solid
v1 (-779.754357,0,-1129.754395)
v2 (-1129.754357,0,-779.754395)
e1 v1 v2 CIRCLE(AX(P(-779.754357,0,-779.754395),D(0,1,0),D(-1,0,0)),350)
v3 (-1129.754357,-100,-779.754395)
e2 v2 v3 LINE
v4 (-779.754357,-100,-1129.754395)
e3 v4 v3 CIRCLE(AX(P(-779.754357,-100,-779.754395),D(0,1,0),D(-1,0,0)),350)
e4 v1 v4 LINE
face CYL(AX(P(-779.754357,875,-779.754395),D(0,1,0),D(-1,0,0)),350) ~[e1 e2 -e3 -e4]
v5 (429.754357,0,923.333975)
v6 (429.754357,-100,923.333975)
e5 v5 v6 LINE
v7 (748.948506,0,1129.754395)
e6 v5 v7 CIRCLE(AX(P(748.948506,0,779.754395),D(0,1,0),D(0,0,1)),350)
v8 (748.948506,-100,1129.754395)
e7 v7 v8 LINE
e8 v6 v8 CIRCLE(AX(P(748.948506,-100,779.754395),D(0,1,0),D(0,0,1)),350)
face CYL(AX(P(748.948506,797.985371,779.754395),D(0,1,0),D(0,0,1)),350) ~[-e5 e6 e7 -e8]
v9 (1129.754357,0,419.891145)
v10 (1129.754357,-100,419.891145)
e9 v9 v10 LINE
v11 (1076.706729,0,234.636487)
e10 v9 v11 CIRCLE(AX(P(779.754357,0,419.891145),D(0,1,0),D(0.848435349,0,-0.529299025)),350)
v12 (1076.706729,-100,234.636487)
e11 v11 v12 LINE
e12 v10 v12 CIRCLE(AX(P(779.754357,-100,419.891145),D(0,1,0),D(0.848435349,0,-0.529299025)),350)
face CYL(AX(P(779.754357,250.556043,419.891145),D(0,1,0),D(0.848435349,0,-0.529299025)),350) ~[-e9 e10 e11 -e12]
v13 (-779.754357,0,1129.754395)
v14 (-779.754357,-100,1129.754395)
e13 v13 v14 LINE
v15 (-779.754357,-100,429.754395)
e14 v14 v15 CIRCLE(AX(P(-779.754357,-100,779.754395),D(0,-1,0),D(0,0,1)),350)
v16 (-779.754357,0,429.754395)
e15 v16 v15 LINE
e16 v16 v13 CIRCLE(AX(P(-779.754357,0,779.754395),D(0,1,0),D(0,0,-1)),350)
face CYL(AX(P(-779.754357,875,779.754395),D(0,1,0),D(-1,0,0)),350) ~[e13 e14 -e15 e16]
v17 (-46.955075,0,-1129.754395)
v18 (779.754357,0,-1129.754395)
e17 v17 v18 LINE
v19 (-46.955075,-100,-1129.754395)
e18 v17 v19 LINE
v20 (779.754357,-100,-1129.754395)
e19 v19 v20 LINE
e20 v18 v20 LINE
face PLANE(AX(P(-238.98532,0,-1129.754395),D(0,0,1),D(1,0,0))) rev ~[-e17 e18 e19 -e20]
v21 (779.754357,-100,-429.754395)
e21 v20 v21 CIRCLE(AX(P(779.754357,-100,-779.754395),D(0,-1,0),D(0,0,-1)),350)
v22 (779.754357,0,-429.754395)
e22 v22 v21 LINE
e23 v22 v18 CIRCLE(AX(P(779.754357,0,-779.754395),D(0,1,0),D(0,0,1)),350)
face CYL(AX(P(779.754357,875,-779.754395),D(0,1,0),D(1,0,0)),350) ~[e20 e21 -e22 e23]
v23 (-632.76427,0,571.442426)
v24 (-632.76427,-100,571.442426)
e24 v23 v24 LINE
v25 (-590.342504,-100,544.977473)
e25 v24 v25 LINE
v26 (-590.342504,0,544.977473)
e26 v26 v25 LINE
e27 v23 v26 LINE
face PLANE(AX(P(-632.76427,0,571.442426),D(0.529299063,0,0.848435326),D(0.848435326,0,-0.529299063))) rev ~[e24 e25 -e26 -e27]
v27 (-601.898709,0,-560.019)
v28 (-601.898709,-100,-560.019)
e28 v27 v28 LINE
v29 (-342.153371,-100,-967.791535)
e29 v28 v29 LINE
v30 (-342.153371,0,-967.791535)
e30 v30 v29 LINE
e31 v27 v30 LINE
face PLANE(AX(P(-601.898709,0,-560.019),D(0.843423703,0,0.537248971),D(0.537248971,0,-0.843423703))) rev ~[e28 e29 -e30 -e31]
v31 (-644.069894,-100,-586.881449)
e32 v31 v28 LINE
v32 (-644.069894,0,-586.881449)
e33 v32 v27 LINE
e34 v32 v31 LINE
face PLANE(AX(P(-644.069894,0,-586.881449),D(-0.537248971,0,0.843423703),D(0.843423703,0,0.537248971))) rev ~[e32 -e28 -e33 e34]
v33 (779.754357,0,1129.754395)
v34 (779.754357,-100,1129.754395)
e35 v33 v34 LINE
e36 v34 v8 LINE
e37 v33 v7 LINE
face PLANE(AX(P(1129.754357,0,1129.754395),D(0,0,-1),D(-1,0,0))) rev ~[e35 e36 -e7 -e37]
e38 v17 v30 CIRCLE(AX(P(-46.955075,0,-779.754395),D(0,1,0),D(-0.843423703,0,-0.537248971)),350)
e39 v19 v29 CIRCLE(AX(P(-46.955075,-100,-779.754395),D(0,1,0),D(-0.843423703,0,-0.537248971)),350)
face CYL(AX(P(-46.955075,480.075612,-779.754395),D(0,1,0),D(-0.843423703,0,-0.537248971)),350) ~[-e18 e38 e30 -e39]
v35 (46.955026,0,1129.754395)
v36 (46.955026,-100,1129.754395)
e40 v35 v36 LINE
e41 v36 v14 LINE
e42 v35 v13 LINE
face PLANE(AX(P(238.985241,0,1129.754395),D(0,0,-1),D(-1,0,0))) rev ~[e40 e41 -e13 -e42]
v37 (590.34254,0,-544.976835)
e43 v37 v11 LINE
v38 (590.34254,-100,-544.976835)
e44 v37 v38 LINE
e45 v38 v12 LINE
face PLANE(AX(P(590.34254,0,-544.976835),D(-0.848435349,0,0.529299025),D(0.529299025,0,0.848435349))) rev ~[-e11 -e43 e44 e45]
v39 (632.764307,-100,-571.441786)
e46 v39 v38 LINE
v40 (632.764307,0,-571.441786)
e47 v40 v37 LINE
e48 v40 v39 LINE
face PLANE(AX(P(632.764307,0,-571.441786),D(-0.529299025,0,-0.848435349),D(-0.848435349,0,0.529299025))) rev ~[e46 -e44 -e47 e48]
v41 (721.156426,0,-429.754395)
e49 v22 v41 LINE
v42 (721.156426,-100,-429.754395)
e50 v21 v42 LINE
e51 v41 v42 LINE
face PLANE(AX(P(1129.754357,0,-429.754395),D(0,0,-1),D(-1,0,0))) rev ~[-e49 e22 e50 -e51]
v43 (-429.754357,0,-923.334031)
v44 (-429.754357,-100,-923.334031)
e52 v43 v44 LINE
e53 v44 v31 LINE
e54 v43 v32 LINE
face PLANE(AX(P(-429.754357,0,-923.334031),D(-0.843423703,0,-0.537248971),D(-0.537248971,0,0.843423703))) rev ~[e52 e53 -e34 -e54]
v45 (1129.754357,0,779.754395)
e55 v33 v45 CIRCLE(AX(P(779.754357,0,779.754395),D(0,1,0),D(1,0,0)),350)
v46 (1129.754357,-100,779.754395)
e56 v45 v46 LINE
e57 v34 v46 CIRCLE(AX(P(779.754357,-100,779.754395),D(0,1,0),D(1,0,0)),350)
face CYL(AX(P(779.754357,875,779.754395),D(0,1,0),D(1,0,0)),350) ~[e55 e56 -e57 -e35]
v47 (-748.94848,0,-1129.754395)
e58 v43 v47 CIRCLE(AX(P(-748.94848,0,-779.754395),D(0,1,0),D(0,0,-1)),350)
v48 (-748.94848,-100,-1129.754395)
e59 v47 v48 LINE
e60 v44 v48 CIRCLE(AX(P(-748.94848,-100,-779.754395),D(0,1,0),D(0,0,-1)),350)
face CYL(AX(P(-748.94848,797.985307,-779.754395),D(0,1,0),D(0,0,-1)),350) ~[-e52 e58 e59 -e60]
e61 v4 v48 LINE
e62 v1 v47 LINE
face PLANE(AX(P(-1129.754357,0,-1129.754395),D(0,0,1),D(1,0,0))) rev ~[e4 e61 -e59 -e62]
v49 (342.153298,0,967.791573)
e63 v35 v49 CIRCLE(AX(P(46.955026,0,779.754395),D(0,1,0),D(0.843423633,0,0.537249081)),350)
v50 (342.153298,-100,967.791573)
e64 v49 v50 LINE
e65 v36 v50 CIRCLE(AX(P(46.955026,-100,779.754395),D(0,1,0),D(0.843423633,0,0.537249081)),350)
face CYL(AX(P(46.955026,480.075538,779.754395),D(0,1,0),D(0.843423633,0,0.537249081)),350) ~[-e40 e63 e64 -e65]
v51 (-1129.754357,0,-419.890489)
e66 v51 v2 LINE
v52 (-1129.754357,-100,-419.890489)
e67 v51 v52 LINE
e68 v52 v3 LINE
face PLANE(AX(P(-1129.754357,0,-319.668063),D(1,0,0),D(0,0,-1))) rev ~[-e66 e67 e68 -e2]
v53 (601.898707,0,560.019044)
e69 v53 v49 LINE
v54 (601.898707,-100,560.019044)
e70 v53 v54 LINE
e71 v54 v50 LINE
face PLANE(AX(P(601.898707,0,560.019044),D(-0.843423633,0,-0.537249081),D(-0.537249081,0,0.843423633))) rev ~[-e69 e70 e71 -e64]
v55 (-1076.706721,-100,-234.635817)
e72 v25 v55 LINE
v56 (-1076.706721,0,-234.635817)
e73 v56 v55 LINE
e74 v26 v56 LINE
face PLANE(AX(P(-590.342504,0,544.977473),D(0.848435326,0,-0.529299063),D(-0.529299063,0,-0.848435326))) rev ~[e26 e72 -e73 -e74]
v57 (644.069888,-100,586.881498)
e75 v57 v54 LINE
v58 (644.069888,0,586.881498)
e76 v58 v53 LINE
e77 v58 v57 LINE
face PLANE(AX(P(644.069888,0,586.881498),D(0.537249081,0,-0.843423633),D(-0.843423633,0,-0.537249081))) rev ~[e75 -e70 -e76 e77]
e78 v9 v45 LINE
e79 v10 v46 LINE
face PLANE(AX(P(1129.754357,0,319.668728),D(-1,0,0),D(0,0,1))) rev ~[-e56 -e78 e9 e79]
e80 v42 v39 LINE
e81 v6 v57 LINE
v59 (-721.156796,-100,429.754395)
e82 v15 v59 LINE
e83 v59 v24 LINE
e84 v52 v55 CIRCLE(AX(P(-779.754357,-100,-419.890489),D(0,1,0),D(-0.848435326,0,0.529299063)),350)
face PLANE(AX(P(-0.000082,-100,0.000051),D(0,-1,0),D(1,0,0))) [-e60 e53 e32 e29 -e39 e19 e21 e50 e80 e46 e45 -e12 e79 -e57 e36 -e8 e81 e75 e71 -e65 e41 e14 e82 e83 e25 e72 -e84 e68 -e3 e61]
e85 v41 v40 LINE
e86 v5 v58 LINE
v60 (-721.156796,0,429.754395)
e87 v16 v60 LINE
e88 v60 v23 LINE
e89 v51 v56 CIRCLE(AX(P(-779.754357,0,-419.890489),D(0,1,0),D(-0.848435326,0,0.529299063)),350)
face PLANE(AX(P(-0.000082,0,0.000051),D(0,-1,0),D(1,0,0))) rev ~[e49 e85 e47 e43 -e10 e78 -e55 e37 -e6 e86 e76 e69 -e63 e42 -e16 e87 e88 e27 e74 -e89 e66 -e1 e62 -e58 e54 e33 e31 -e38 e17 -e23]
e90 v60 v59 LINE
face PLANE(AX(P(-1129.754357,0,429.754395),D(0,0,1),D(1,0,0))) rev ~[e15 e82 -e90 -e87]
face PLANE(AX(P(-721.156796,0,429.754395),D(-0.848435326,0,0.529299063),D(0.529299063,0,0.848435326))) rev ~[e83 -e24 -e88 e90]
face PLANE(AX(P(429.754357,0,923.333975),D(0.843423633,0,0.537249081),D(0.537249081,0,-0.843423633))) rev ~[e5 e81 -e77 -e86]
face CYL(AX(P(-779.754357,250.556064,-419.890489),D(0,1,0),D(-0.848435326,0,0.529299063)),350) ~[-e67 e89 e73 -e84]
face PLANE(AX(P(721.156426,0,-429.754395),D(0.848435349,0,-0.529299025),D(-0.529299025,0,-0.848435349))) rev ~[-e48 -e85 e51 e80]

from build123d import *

# Parameters (mm, degrees)
F1_DEPTH     = 100
F2_T1_DEPTH  = 1850
F2_T3_DEPTH  = 1695.9707417334
F2_T5_DEPTH  = 1695.9706144549
F2_T7_DEPTH  = 601.1121280065
F2_T9_DEPTH  = 1060.1512237757
F2_T11_DEPTH = 601.1120863274
F2_T13_DEPTH = 1060.1510758761


# Not quite as in the source:
# - a fillet or chamfer that OpenCascade refuses, or shapes differently, is made with other operations: its cross-section is extruded or revolved along the edge and cut away or added


with BuildPart() as f1:
    # F0 (on Front) → F1 (new body)
    with BuildSketch(Plane.XZ):
        Polygon((1129.7543572, 319.6687281531), (1129.7543572, 1129.7543953), (429.7543572, 1129.7543953), (429.7543572, 923.3339748412), (644.069888311, 586.8814977509), (601.898706638, 560.0190437248), (238.9852410529, 1129.7543953), (-1129.7543572, 1129.7543953), (-1129.7543572, 429.7543953), (-721.1567962335, 429.7543953), (-632.764270148, 571.4424256952), (-590.342503852, 544.9774725622), (-1129.7543572, -319.6680631783), (-1129.7543572, -1129.7543953), (-429.7543572, -1129.7543953), (-429.7543572, -923.3340314322), (-644.0698939815, -586.8814489736), (-601.8987088185, -560.0190004264), (-238.9853197059, -1129.7543953), (1129.7543572, -1129.7543953), (1129.7543572, -429.7543953), (721.156425601, -429.7543953), (632.7643072985, -571.4417859327), (590.3425398375, -544.9768346673), align=None)
    extrude(amount=F1_DEPTH)

    # F2: fillet of radius 350 on 12 edges, made by hand

    # F2_s2 → F2_t1 (cut)
    with BuildSketch(Plane.XZ.offset(-875)):
        with BuildLine():
            ThreePointArc((1129.7543572, 779.7543953), (1027.2417306153, 1027.2417687153), (779.7543572, 1129.7543953))
            Line((779.7543572, 1129.7543953), (1129.7543572, 1129.7543953))
            Line((1129.7543572, 1129.7543953), (1129.7543572, 779.7543953))
        make_face()
        with BuildLine():
            ThreePointArc((-779.7543572, 1129.7543953), (-1027.2417306153, 1027.2417687153), (-1129.7543572, 779.7543953))
            Line((-1129.7543572, 779.7543953), (-1129.7543572, 1129.7543953))
            Line((-1129.7543572, 1129.7543953), (-779.7543572, 1129.7543953))
        make_face()
        with BuildLine():
            ThreePointArc((-1129.7543572, 779.7543953), (-1027.2417306153, 532.2670218847), (-779.7543572, 429.7543953))
            Line((-779.7543572, 429.7543953), (-1129.7543572, 429.7543953))
            Line((-1129.7543572, 429.7543953), (-1129.7543572, 779.7543953))
        make_face()
        with BuildLine():
            ThreePointArc((-1129.7543572, -779.7543953), (-1027.2417306153, -1027.2417687153), (-779.7543572, -1129.7543953))
            Line((-779.7543572, -1129.7543953), (-1129.7543572, -1129.7543953))
            Line((-1129.7543572, -1129.7543953), (-1129.7543572, -779.7543953))
        make_face()
        with BuildLine():
            ThreePointArc((1129.7543572, -779.7543953), (1027.2417306153, -1027.2417687153), (779.7543572, -1129.7543953))
            Line((779.7543572, -1129.7543953), (1129.7543572, -1129.7543953))
            Line((1129.7543572, -1129.7543953), (1129.7543572, -779.7543953))
        make_face()
        with BuildLine():
            ThreePointArc((1129.7543572, -779.7543953), (1027.2417306153, -532.2670218847), (779.7543572, -429.7543953))
            Line((779.7543572, -429.7543953), (1129.7543572, -429.7543953))
            Line((1129.7543572, -429.7543953), (1129.7543572, -779.7543953))
        make_face()
    extrude(amount=F2_T1_DEPTH, mode=Mode.SUBTRACT)

    # F2_s4 → F2_t3 (cut)
    with BuildSketch(Plane.XZ.offset(-797.9853708667)):
        with BuildLine():
            ThreePointArc((748.9485055467, 1129.7543953), (558.8864799332, 1073.653062224), (429.7543572, 923.3339748412))
            Line((429.7543572, 923.3339748412), (429.7543572, 1129.7543953))
            Line((429.7543572, 1129.7543953), (748.9485055467, 1129.7543953))
        make_face()
    extrude(amount=F2_T3_DEPTH, mode=Mode.SUBTRACT)

    # F2_s6 → F2_t5 (cut)
    with BuildSketch(Plane.XZ.offset(-797.9853072275)):
        with BuildLine():
            ThreePointArc((-748.948480091, -1129.7543953), (-558.8864805307, -1073.6530790724), (-429.7543572, -923.3340314322))
            Line((-429.7543572, -923.3340314322), (-429.7543572, -1129.7543953))
            Line((-429.7543572, -1129.7543953), (-748.948480091, -1129.7543953))
        make_face()
    extrude(amount=F2_T5_DEPTH, mode=Mode.SUBTRACT)

    # F2_s8 → F2_t7 (cut)
    with BuildSketch(Plane.XZ.offset(-250.5560640033)):
        with BuildLine():
            ThreePointArc((-1076.7067212718, -234.6358168488), (-1116.2311969863, -323.5404172309), (-1129.7543572, -419.8904887796))
            Line((-1129.7543572, -419.8904887796), (-1129.7543572, -319.6680631783))
            Line((-1129.7543572, -319.6680631783), (-1076.7067212718, -234.6358168488))
        make_face()
    extrude(amount=F2_T7_DEPTH, mode=Mode.SUBTRACT)

    # F2_s10 → F2_t9 (cut)
    with BuildSketch(Plane.XZ.offset(-480.0756118878)):
        with BuildLine():
            ThreePointArc((-342.1533710911, -967.7915351311), (-215.310355621, -1086.6037059892), (-46.9550749508, -1129.7543953))
            Line((-46.9550749508, -1129.7543953), (-238.9853197059, -1129.7543953))
            Line((-238.9853197059, -1129.7543953), (-342.1533710911, -967.7915351311))
        make_face()
    extrude(amount=F2_T9_DEPTH, mode=Mode.SUBTRACT)

    # F2_s12 → F2_t11 (cut)
    with BuildSketch(Plane.XZ.offset(-250.5560431637)):
        with BuildLine():
            ThreePointArc((1076.7067294274, 234.6364865607), (1116.2311991071, 323.5410812763), (1129.7543572, 419.8911454186))
            Line((1129.7543572, 419.8911454186), (1129.7543572, 319.6687281531))
            Line((1129.7543572, 319.6687281531), (1076.7067294274, 234.6364865607))
        make_face()
    extrude(amount=F2_T11_DEPTH, mode=Mode.SUBTRACT)

    # F2_s14 → F2_t13 (cut)
    with BuildSketch(Plane.XZ.offset(-480.0755379381)):
        with BuildLine():
            ThreePointArc((342.1532975884, 967.791573483), (215.3102866151, 1086.6037169255), (46.9550258777, 1129.7543953))
            Line((46.9550258777, 1129.7543953), (238.9852410529, 1129.7543953))
            Line((238.9852410529, 1129.7543953), (342.1532975884, 967.791573483))
        make_face()
    extrude(amount=F2_T13_DEPTH, mode=Mode.SUBTRACT)


solid = f1.part
